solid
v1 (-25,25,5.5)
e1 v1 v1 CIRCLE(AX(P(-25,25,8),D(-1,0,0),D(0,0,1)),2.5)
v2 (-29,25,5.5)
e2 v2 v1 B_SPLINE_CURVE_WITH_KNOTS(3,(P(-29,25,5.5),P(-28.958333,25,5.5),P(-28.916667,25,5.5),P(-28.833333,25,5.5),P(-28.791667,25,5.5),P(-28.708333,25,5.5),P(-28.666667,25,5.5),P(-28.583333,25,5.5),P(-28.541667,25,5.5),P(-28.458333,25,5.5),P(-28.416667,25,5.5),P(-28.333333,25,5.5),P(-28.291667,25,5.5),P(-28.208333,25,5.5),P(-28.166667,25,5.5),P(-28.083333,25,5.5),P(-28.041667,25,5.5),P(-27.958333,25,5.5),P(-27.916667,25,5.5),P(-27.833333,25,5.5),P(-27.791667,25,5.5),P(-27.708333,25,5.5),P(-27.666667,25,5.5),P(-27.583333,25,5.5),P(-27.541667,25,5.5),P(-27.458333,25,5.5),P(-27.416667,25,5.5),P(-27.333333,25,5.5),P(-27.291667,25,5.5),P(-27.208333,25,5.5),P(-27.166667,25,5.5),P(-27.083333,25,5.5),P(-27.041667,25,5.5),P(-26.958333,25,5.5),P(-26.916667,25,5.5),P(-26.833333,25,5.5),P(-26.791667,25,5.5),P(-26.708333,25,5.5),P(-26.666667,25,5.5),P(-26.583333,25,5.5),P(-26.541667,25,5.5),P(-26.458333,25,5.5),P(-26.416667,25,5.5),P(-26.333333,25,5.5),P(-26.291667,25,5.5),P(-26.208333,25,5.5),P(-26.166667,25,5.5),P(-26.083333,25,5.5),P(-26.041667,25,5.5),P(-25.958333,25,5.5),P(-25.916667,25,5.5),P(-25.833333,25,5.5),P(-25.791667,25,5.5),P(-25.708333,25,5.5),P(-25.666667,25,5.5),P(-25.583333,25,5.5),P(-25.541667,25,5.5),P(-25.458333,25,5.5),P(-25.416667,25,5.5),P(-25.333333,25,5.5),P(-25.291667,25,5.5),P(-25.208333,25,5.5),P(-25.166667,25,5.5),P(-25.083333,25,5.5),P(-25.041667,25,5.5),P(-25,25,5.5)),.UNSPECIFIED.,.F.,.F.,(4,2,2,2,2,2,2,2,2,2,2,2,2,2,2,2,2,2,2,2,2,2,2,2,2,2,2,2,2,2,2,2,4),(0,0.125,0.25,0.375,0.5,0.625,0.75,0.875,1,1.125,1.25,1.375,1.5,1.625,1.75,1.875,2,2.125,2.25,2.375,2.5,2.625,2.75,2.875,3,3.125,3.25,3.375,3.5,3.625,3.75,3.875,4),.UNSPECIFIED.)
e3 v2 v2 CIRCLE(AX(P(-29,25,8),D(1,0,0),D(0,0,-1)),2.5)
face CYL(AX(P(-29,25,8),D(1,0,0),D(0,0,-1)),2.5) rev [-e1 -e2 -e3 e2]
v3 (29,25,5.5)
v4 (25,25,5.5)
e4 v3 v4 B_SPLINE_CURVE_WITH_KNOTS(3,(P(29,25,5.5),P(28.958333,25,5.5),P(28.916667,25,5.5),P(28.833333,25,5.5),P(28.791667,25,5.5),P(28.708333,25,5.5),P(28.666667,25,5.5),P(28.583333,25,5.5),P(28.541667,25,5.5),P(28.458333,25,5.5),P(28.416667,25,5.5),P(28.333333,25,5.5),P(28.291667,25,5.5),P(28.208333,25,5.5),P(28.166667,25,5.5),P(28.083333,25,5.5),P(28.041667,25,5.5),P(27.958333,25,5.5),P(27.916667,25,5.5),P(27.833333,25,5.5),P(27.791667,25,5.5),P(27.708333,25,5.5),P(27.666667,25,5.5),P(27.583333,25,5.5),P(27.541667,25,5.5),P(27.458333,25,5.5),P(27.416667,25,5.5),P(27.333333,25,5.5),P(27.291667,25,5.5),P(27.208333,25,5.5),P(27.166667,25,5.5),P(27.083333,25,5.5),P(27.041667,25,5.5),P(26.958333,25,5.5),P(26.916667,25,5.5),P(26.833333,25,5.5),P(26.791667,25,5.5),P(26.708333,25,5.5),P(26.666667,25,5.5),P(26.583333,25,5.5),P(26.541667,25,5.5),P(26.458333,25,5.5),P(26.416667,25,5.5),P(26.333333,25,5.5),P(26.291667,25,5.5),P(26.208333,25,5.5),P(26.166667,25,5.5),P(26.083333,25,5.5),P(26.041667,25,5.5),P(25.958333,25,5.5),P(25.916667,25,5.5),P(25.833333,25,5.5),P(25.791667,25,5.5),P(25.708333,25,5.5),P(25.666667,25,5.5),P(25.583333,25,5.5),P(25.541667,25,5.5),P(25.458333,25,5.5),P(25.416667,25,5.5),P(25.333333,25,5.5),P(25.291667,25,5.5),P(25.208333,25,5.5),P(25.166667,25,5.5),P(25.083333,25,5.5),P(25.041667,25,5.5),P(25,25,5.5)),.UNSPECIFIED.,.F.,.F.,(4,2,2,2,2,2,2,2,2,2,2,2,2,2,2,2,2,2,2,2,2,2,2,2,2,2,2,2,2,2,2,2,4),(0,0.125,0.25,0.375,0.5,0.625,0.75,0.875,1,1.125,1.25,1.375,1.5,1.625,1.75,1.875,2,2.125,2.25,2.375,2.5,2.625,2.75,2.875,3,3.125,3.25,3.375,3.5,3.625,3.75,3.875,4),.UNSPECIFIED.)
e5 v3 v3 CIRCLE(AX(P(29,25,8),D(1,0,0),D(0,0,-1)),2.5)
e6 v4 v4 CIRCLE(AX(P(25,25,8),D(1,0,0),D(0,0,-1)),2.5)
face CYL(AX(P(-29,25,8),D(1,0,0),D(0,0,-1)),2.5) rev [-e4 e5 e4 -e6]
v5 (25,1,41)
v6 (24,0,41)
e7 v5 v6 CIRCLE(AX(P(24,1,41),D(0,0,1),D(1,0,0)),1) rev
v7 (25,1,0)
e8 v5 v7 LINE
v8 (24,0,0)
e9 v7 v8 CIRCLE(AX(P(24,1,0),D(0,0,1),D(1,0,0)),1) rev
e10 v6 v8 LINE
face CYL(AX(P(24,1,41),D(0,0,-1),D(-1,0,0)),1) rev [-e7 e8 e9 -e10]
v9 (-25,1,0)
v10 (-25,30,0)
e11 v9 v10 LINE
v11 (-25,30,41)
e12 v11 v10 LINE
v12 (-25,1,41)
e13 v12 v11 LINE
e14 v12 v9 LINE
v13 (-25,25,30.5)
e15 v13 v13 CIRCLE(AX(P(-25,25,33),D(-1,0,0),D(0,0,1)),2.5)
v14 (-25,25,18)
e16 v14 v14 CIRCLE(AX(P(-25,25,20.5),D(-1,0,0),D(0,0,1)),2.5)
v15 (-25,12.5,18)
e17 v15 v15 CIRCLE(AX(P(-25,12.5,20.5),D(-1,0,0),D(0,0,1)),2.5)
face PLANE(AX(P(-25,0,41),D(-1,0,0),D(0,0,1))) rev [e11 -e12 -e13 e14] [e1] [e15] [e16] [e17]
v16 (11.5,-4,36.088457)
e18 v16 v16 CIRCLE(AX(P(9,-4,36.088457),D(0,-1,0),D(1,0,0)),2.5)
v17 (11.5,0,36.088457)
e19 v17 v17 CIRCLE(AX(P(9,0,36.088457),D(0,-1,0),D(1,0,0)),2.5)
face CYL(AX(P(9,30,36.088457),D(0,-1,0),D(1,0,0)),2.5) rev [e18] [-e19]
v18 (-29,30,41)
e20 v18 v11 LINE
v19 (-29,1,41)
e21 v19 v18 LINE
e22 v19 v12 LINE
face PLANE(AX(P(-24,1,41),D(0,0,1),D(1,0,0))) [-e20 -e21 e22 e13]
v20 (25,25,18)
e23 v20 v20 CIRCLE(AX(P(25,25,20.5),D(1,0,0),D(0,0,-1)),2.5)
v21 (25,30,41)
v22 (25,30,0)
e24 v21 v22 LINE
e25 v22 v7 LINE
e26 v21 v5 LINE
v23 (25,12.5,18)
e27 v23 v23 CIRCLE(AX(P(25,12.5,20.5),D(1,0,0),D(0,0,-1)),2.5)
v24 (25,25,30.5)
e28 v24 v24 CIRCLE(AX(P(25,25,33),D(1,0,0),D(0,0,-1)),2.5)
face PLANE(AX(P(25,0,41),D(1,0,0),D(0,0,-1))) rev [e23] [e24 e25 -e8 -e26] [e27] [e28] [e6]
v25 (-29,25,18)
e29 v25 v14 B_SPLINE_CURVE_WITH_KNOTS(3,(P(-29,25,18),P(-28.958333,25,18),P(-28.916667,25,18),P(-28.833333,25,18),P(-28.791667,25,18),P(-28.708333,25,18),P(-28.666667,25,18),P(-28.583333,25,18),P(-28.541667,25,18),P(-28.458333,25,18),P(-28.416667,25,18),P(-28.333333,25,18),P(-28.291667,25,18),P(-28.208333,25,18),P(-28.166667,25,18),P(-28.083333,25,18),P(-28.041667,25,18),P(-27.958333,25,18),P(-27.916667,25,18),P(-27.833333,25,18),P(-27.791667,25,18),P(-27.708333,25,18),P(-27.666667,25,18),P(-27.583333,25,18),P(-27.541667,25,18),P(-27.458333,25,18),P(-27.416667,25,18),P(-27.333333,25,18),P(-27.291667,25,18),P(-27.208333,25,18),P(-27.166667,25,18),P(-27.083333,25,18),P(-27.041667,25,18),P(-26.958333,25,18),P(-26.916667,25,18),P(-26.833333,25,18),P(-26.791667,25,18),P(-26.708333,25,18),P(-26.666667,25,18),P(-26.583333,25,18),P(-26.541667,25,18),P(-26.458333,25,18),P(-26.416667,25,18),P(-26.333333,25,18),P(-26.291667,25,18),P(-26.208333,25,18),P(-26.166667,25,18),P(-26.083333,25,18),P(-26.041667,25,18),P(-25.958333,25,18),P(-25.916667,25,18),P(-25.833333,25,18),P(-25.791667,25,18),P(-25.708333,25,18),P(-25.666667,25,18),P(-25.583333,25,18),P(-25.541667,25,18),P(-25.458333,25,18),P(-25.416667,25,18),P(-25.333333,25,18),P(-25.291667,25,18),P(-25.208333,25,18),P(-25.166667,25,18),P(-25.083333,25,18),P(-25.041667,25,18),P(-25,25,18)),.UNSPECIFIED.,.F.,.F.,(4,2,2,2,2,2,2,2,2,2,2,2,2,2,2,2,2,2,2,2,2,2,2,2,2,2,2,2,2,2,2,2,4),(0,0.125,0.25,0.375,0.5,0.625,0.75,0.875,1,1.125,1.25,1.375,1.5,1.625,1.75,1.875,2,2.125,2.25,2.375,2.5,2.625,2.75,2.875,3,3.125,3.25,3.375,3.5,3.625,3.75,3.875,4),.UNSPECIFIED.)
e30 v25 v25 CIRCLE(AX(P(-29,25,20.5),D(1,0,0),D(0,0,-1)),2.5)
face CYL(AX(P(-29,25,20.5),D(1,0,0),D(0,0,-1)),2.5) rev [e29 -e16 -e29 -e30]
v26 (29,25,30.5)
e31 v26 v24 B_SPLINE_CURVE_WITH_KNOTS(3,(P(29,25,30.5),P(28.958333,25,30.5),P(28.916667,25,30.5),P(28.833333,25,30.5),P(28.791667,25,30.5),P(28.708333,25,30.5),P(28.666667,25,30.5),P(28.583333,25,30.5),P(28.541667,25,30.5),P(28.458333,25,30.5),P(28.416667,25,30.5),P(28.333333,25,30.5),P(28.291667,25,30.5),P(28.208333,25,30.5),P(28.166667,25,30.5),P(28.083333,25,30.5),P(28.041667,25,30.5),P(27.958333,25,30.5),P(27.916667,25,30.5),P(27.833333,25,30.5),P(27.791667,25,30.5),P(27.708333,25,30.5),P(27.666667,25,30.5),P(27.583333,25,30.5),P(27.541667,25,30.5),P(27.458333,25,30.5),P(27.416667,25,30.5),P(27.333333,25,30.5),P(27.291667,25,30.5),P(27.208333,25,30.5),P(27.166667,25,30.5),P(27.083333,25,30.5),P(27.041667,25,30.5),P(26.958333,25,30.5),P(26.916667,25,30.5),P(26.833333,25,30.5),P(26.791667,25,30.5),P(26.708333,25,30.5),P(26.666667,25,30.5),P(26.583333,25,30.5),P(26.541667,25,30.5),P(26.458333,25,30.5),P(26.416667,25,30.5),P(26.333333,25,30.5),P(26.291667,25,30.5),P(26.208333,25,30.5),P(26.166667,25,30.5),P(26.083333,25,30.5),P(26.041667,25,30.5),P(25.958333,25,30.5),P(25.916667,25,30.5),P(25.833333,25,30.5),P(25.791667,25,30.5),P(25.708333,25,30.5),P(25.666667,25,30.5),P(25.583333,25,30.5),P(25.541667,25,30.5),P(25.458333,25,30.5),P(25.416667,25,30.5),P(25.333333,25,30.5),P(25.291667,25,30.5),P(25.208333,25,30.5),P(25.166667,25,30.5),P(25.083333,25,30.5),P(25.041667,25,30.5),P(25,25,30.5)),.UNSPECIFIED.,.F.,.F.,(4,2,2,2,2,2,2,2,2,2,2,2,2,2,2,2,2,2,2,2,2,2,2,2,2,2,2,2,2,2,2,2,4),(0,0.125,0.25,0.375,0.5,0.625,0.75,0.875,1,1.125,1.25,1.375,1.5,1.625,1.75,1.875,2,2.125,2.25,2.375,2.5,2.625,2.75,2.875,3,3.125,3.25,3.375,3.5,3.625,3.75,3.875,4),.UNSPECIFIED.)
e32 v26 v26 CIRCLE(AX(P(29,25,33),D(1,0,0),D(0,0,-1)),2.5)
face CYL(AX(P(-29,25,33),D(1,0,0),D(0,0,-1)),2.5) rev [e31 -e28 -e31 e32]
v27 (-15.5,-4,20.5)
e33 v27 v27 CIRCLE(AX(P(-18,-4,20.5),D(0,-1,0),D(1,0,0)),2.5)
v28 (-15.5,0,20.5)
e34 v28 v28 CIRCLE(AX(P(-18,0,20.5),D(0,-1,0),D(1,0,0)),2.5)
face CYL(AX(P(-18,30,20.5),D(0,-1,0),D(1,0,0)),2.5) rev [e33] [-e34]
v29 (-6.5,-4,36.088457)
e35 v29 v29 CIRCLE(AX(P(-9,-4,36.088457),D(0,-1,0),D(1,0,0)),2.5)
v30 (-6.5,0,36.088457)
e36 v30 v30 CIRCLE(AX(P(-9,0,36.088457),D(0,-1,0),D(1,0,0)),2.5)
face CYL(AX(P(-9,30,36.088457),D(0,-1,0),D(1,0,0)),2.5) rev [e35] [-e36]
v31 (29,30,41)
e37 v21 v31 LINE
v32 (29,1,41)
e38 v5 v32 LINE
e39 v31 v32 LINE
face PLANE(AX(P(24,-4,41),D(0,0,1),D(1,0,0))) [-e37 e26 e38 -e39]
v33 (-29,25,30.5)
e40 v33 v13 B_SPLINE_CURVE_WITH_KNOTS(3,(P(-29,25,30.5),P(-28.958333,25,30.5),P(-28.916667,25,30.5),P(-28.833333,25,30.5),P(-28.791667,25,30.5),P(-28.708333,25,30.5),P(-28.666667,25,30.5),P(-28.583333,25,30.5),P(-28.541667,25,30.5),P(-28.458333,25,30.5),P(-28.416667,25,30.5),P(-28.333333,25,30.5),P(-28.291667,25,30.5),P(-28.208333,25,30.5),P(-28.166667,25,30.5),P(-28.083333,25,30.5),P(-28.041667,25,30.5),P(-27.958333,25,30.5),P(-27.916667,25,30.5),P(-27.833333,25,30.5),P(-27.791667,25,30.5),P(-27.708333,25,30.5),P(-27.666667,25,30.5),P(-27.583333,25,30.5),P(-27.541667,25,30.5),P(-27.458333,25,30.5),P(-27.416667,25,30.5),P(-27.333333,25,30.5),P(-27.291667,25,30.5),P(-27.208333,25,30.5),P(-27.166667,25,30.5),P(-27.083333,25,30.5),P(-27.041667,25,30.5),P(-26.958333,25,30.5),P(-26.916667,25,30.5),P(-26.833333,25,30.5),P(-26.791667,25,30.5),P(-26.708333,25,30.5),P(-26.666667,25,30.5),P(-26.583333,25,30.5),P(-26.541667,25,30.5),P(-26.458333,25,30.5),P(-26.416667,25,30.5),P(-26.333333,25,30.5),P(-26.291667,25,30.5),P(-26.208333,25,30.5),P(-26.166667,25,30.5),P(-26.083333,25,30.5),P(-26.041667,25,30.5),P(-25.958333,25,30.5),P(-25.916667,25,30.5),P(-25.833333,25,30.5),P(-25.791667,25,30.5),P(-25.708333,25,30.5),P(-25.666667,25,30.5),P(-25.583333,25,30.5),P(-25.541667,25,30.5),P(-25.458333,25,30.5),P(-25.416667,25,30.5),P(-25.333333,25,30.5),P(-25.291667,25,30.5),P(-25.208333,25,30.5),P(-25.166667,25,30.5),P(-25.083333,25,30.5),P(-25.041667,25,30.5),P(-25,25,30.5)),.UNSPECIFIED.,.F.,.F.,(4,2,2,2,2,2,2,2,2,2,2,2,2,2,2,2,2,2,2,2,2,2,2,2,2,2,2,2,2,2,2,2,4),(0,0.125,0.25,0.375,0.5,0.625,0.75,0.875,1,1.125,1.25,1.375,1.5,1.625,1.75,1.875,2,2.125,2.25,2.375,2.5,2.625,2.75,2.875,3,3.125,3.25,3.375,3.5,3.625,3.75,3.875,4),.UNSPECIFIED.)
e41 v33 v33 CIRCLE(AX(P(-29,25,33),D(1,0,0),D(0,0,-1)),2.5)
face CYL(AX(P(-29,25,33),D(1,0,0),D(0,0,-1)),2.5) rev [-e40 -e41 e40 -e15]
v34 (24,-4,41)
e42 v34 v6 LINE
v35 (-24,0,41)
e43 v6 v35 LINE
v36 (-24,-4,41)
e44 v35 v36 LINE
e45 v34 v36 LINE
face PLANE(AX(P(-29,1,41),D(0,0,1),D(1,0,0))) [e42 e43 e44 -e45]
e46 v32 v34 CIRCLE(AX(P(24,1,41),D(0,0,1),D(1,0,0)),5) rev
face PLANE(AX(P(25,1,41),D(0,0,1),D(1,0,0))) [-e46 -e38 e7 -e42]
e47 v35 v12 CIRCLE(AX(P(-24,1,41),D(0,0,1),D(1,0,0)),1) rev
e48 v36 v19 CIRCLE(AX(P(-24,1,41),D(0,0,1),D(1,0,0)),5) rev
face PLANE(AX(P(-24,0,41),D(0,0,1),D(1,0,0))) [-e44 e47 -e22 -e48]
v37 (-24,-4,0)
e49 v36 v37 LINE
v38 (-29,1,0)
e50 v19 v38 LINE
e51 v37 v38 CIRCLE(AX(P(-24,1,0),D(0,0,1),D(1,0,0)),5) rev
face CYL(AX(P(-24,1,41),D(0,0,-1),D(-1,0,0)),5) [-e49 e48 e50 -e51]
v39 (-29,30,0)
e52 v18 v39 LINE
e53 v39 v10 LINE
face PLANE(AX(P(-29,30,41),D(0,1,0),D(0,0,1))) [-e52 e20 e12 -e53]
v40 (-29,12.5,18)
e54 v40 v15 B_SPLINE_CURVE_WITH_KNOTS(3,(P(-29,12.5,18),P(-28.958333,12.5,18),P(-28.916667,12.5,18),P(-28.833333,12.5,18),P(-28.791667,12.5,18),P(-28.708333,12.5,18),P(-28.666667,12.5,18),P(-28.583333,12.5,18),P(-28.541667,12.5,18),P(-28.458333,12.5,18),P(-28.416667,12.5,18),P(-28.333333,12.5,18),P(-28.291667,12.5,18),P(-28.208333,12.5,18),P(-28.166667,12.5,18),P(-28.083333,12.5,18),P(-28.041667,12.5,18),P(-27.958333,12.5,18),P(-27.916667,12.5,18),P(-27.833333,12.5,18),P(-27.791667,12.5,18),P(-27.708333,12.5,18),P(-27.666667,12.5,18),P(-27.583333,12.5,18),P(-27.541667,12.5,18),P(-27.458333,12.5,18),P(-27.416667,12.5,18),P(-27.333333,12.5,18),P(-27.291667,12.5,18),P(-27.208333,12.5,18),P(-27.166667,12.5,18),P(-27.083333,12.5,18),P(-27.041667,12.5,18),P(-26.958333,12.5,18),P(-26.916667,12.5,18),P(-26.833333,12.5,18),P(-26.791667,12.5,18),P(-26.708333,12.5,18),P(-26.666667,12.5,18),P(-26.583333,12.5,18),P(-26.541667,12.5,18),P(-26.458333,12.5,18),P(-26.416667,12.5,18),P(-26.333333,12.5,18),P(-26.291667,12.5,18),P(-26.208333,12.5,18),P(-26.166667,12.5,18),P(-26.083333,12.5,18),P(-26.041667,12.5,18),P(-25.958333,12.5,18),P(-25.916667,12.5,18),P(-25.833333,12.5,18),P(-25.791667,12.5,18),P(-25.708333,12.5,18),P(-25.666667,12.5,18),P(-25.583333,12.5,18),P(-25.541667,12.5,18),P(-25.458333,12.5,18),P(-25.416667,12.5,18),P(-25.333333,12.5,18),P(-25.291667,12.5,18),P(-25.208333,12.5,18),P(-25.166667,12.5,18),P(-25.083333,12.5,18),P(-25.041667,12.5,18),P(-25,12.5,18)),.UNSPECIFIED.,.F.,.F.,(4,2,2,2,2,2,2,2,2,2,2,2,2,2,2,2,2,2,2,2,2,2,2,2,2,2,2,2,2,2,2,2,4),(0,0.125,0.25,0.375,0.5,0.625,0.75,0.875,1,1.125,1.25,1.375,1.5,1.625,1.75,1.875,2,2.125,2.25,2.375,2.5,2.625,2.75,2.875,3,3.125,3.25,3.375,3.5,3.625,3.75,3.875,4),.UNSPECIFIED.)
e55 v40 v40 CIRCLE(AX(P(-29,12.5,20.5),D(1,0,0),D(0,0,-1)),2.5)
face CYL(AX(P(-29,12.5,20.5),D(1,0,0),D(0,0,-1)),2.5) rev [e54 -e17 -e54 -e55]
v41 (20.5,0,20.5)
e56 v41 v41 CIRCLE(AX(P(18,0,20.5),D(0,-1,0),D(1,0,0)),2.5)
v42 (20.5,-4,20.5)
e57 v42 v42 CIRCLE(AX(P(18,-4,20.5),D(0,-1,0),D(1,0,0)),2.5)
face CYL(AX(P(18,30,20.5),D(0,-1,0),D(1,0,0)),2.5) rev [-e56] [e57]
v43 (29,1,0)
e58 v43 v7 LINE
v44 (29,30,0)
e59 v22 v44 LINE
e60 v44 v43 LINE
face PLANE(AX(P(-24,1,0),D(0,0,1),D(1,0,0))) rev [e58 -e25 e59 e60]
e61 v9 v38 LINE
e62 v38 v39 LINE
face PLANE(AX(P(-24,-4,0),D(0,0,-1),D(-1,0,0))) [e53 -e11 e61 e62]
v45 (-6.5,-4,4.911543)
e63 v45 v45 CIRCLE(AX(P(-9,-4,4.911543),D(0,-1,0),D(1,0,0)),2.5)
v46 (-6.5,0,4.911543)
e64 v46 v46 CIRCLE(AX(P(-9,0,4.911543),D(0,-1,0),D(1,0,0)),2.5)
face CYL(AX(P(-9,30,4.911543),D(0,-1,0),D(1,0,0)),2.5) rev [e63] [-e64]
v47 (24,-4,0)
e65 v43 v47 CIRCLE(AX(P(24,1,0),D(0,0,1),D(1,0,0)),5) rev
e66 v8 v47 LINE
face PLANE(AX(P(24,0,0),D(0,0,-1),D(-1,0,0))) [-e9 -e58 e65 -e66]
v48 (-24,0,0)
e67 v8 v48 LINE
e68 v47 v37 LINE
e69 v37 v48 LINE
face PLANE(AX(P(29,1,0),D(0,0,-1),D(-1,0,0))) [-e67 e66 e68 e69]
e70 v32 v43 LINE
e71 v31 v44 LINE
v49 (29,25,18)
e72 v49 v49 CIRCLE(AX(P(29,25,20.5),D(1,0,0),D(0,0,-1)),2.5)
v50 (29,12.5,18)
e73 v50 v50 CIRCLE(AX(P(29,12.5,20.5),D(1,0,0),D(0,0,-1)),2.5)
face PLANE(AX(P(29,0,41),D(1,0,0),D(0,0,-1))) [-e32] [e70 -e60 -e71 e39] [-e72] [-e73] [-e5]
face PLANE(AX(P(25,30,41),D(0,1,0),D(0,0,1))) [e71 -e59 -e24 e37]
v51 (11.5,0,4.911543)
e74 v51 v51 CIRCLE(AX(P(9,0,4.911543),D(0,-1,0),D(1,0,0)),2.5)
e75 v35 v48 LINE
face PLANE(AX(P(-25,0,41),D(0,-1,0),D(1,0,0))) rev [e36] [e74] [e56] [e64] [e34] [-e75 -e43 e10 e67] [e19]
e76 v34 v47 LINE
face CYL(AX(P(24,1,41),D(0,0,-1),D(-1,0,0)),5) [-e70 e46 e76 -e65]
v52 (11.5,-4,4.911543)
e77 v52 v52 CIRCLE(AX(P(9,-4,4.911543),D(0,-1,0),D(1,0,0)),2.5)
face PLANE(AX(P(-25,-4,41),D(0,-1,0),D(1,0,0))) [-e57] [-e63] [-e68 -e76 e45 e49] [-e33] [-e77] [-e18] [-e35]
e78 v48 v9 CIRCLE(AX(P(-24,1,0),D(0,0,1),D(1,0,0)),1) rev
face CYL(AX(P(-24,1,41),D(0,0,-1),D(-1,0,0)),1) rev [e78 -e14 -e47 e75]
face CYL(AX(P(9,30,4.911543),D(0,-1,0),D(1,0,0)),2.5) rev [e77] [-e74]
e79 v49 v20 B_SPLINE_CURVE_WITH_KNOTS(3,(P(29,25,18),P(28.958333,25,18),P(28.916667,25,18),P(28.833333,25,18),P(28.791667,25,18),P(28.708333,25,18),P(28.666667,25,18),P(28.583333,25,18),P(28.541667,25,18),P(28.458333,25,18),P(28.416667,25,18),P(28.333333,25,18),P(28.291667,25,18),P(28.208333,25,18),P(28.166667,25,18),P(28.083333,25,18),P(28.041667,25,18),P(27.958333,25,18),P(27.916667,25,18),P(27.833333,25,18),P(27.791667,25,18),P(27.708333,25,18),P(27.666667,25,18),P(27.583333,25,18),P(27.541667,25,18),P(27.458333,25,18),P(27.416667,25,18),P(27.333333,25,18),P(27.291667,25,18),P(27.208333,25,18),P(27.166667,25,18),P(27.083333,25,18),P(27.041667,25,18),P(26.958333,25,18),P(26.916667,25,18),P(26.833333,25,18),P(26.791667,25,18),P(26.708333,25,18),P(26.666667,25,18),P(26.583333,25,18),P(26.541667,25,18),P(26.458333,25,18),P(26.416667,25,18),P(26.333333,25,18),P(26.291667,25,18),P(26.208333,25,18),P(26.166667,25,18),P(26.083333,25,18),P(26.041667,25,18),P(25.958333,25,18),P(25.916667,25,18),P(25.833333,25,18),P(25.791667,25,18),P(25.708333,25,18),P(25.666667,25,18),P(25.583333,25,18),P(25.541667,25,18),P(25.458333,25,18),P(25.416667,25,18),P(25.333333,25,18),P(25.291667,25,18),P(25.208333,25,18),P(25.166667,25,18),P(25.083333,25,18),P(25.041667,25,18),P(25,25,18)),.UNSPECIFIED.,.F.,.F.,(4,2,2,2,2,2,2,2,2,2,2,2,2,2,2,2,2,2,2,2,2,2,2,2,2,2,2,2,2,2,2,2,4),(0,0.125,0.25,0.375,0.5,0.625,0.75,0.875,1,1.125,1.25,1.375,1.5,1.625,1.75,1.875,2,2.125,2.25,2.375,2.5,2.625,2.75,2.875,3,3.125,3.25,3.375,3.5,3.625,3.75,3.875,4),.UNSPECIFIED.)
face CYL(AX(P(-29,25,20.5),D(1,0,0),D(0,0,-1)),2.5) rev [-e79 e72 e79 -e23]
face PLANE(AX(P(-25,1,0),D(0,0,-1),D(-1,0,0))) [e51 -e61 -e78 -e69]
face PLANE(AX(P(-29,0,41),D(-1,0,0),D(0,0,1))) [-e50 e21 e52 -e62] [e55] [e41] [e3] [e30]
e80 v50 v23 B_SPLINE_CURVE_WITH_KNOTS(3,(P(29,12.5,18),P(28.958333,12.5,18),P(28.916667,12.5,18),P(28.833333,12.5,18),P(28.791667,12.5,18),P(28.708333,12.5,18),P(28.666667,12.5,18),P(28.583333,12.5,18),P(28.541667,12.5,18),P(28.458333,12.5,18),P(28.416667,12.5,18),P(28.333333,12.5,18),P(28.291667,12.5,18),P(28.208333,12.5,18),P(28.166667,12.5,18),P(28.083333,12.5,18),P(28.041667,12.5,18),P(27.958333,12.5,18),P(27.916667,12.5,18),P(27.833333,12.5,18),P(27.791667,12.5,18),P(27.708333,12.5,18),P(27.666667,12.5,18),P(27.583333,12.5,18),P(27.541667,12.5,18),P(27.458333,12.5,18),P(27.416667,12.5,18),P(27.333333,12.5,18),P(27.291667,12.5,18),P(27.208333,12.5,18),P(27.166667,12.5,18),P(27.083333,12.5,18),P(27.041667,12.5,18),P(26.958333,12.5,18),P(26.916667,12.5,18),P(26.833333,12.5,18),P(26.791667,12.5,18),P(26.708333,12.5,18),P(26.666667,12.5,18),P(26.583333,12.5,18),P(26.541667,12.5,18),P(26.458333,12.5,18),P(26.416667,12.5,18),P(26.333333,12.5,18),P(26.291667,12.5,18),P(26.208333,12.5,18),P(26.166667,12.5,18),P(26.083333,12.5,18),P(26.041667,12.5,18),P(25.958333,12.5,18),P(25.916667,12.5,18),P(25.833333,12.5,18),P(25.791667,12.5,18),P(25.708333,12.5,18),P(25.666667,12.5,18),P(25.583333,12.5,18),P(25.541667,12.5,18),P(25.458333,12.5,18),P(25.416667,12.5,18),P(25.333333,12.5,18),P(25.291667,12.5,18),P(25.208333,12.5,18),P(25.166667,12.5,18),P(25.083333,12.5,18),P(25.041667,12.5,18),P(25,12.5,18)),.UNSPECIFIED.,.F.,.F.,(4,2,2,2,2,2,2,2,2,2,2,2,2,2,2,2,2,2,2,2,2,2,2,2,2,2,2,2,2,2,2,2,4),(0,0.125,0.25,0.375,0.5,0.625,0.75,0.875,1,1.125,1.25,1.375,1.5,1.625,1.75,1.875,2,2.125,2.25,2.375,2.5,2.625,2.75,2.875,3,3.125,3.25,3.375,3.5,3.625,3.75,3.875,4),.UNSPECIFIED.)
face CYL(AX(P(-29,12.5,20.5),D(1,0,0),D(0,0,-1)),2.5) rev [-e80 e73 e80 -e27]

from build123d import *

# Parameters (mm, degrees)
SM_BASE_FLANGE_1_DEPTH   = 41
SKETCH_9_R               = 2.5
CUT_EXTRUDE_4_DEPTH      = 61.6465168
CUT_EXTRUDE_5_DEPTH      = 78.103826105
CUT_EXTRUDE_5_DEPTH_BACK = 78.103826105
SKETCH_10_R              = 2.5


# Sheet-metal steps are written as plain solids
with BuildPart() as part:
    # Sketch 1 → Базовая кромка1 (new body)
    with BuildSketch(Plane.XY):
        with BuildLine():
            Line((-25, 30), (-25, 1))
            ThreePointArc((-25, 1), (-24.707106781, 0.292893219), (-24, 0))
            Line((-24, 0), (24, 0))
            ThreePointArc((24, 0), (24.707106781, 0.292893219), (25, 1))
            Line((25, 1), (25, 30))
            Line((25, 30), (29, 30))
            Line((29, 30), (29, 1))
            ThreePointArc((29, 1), (27.535533906, -2.535533906), (24, -4))
            Line((24, -4), (-24, -4))
            ThreePointArc((-24, -4), (-27.535533906, -2.535533906), (-29, 1))
            Line((-29, 1), (-29, 30))
            Line((-29, 30), (-25, 30))
        make_face()
    extrude(amount=SM_BASE_FLANGE_1_DEPTH)

    # Эскиз9 → Вырез-Вытянуть4 (cut, through all)
    with BuildSketch(Plane.XZ.offset(4)):
        with Locations((-18, 20.5)):
            Circle(SKETCH_9_R)
        with Locations((-9, 36.088457268)):
            Circle(SKETCH_9_R)
        with Locations((9, 36.088457268)):
            Circle(SKETCH_9_R)
        with Locations((18, 20.5)):
            Circle(SKETCH_9_R)
        with Locations((9, 4.911542732)):
            Circle(SKETCH_9_R)
        with Locations((-9, 4.911542732)):
            Circle(SKETCH_9_R)
    extrude(amount=-CUT_EXTRUDE_4_DEPTH, mode=Mode.SUBTRACT)

    # Эскиз10 → Вырез-Вытянуть5 (cut, two sides: drawn at the far end of the back side and taken through both)
    with BuildSketch(Plane(origin=(29, 0, 0), x_dir=(0, 0, -1), z_dir=(1, 0, 0)).offset(-CUT_EXTRUDE_5_DEPTH_BACK)):
        with Locations((-33, 25)):
            Circle(SKETCH_10_R)
        with Locations((-20.5, 25)):
            Circle(SKETCH_10_R)
        with Locations((-8, 25)):
            Circle(SKETCH_10_R)
        with Locations((-20.5, 12.5)):
            Circle(SKETCH_10_R)
    extrude(amount=CUT_EXTRUDE_5_DEPTH + CUT_EXTRUDE_5_DEPTH_BACK, mode=Mode.SUBTRACT)


solid = part.part
